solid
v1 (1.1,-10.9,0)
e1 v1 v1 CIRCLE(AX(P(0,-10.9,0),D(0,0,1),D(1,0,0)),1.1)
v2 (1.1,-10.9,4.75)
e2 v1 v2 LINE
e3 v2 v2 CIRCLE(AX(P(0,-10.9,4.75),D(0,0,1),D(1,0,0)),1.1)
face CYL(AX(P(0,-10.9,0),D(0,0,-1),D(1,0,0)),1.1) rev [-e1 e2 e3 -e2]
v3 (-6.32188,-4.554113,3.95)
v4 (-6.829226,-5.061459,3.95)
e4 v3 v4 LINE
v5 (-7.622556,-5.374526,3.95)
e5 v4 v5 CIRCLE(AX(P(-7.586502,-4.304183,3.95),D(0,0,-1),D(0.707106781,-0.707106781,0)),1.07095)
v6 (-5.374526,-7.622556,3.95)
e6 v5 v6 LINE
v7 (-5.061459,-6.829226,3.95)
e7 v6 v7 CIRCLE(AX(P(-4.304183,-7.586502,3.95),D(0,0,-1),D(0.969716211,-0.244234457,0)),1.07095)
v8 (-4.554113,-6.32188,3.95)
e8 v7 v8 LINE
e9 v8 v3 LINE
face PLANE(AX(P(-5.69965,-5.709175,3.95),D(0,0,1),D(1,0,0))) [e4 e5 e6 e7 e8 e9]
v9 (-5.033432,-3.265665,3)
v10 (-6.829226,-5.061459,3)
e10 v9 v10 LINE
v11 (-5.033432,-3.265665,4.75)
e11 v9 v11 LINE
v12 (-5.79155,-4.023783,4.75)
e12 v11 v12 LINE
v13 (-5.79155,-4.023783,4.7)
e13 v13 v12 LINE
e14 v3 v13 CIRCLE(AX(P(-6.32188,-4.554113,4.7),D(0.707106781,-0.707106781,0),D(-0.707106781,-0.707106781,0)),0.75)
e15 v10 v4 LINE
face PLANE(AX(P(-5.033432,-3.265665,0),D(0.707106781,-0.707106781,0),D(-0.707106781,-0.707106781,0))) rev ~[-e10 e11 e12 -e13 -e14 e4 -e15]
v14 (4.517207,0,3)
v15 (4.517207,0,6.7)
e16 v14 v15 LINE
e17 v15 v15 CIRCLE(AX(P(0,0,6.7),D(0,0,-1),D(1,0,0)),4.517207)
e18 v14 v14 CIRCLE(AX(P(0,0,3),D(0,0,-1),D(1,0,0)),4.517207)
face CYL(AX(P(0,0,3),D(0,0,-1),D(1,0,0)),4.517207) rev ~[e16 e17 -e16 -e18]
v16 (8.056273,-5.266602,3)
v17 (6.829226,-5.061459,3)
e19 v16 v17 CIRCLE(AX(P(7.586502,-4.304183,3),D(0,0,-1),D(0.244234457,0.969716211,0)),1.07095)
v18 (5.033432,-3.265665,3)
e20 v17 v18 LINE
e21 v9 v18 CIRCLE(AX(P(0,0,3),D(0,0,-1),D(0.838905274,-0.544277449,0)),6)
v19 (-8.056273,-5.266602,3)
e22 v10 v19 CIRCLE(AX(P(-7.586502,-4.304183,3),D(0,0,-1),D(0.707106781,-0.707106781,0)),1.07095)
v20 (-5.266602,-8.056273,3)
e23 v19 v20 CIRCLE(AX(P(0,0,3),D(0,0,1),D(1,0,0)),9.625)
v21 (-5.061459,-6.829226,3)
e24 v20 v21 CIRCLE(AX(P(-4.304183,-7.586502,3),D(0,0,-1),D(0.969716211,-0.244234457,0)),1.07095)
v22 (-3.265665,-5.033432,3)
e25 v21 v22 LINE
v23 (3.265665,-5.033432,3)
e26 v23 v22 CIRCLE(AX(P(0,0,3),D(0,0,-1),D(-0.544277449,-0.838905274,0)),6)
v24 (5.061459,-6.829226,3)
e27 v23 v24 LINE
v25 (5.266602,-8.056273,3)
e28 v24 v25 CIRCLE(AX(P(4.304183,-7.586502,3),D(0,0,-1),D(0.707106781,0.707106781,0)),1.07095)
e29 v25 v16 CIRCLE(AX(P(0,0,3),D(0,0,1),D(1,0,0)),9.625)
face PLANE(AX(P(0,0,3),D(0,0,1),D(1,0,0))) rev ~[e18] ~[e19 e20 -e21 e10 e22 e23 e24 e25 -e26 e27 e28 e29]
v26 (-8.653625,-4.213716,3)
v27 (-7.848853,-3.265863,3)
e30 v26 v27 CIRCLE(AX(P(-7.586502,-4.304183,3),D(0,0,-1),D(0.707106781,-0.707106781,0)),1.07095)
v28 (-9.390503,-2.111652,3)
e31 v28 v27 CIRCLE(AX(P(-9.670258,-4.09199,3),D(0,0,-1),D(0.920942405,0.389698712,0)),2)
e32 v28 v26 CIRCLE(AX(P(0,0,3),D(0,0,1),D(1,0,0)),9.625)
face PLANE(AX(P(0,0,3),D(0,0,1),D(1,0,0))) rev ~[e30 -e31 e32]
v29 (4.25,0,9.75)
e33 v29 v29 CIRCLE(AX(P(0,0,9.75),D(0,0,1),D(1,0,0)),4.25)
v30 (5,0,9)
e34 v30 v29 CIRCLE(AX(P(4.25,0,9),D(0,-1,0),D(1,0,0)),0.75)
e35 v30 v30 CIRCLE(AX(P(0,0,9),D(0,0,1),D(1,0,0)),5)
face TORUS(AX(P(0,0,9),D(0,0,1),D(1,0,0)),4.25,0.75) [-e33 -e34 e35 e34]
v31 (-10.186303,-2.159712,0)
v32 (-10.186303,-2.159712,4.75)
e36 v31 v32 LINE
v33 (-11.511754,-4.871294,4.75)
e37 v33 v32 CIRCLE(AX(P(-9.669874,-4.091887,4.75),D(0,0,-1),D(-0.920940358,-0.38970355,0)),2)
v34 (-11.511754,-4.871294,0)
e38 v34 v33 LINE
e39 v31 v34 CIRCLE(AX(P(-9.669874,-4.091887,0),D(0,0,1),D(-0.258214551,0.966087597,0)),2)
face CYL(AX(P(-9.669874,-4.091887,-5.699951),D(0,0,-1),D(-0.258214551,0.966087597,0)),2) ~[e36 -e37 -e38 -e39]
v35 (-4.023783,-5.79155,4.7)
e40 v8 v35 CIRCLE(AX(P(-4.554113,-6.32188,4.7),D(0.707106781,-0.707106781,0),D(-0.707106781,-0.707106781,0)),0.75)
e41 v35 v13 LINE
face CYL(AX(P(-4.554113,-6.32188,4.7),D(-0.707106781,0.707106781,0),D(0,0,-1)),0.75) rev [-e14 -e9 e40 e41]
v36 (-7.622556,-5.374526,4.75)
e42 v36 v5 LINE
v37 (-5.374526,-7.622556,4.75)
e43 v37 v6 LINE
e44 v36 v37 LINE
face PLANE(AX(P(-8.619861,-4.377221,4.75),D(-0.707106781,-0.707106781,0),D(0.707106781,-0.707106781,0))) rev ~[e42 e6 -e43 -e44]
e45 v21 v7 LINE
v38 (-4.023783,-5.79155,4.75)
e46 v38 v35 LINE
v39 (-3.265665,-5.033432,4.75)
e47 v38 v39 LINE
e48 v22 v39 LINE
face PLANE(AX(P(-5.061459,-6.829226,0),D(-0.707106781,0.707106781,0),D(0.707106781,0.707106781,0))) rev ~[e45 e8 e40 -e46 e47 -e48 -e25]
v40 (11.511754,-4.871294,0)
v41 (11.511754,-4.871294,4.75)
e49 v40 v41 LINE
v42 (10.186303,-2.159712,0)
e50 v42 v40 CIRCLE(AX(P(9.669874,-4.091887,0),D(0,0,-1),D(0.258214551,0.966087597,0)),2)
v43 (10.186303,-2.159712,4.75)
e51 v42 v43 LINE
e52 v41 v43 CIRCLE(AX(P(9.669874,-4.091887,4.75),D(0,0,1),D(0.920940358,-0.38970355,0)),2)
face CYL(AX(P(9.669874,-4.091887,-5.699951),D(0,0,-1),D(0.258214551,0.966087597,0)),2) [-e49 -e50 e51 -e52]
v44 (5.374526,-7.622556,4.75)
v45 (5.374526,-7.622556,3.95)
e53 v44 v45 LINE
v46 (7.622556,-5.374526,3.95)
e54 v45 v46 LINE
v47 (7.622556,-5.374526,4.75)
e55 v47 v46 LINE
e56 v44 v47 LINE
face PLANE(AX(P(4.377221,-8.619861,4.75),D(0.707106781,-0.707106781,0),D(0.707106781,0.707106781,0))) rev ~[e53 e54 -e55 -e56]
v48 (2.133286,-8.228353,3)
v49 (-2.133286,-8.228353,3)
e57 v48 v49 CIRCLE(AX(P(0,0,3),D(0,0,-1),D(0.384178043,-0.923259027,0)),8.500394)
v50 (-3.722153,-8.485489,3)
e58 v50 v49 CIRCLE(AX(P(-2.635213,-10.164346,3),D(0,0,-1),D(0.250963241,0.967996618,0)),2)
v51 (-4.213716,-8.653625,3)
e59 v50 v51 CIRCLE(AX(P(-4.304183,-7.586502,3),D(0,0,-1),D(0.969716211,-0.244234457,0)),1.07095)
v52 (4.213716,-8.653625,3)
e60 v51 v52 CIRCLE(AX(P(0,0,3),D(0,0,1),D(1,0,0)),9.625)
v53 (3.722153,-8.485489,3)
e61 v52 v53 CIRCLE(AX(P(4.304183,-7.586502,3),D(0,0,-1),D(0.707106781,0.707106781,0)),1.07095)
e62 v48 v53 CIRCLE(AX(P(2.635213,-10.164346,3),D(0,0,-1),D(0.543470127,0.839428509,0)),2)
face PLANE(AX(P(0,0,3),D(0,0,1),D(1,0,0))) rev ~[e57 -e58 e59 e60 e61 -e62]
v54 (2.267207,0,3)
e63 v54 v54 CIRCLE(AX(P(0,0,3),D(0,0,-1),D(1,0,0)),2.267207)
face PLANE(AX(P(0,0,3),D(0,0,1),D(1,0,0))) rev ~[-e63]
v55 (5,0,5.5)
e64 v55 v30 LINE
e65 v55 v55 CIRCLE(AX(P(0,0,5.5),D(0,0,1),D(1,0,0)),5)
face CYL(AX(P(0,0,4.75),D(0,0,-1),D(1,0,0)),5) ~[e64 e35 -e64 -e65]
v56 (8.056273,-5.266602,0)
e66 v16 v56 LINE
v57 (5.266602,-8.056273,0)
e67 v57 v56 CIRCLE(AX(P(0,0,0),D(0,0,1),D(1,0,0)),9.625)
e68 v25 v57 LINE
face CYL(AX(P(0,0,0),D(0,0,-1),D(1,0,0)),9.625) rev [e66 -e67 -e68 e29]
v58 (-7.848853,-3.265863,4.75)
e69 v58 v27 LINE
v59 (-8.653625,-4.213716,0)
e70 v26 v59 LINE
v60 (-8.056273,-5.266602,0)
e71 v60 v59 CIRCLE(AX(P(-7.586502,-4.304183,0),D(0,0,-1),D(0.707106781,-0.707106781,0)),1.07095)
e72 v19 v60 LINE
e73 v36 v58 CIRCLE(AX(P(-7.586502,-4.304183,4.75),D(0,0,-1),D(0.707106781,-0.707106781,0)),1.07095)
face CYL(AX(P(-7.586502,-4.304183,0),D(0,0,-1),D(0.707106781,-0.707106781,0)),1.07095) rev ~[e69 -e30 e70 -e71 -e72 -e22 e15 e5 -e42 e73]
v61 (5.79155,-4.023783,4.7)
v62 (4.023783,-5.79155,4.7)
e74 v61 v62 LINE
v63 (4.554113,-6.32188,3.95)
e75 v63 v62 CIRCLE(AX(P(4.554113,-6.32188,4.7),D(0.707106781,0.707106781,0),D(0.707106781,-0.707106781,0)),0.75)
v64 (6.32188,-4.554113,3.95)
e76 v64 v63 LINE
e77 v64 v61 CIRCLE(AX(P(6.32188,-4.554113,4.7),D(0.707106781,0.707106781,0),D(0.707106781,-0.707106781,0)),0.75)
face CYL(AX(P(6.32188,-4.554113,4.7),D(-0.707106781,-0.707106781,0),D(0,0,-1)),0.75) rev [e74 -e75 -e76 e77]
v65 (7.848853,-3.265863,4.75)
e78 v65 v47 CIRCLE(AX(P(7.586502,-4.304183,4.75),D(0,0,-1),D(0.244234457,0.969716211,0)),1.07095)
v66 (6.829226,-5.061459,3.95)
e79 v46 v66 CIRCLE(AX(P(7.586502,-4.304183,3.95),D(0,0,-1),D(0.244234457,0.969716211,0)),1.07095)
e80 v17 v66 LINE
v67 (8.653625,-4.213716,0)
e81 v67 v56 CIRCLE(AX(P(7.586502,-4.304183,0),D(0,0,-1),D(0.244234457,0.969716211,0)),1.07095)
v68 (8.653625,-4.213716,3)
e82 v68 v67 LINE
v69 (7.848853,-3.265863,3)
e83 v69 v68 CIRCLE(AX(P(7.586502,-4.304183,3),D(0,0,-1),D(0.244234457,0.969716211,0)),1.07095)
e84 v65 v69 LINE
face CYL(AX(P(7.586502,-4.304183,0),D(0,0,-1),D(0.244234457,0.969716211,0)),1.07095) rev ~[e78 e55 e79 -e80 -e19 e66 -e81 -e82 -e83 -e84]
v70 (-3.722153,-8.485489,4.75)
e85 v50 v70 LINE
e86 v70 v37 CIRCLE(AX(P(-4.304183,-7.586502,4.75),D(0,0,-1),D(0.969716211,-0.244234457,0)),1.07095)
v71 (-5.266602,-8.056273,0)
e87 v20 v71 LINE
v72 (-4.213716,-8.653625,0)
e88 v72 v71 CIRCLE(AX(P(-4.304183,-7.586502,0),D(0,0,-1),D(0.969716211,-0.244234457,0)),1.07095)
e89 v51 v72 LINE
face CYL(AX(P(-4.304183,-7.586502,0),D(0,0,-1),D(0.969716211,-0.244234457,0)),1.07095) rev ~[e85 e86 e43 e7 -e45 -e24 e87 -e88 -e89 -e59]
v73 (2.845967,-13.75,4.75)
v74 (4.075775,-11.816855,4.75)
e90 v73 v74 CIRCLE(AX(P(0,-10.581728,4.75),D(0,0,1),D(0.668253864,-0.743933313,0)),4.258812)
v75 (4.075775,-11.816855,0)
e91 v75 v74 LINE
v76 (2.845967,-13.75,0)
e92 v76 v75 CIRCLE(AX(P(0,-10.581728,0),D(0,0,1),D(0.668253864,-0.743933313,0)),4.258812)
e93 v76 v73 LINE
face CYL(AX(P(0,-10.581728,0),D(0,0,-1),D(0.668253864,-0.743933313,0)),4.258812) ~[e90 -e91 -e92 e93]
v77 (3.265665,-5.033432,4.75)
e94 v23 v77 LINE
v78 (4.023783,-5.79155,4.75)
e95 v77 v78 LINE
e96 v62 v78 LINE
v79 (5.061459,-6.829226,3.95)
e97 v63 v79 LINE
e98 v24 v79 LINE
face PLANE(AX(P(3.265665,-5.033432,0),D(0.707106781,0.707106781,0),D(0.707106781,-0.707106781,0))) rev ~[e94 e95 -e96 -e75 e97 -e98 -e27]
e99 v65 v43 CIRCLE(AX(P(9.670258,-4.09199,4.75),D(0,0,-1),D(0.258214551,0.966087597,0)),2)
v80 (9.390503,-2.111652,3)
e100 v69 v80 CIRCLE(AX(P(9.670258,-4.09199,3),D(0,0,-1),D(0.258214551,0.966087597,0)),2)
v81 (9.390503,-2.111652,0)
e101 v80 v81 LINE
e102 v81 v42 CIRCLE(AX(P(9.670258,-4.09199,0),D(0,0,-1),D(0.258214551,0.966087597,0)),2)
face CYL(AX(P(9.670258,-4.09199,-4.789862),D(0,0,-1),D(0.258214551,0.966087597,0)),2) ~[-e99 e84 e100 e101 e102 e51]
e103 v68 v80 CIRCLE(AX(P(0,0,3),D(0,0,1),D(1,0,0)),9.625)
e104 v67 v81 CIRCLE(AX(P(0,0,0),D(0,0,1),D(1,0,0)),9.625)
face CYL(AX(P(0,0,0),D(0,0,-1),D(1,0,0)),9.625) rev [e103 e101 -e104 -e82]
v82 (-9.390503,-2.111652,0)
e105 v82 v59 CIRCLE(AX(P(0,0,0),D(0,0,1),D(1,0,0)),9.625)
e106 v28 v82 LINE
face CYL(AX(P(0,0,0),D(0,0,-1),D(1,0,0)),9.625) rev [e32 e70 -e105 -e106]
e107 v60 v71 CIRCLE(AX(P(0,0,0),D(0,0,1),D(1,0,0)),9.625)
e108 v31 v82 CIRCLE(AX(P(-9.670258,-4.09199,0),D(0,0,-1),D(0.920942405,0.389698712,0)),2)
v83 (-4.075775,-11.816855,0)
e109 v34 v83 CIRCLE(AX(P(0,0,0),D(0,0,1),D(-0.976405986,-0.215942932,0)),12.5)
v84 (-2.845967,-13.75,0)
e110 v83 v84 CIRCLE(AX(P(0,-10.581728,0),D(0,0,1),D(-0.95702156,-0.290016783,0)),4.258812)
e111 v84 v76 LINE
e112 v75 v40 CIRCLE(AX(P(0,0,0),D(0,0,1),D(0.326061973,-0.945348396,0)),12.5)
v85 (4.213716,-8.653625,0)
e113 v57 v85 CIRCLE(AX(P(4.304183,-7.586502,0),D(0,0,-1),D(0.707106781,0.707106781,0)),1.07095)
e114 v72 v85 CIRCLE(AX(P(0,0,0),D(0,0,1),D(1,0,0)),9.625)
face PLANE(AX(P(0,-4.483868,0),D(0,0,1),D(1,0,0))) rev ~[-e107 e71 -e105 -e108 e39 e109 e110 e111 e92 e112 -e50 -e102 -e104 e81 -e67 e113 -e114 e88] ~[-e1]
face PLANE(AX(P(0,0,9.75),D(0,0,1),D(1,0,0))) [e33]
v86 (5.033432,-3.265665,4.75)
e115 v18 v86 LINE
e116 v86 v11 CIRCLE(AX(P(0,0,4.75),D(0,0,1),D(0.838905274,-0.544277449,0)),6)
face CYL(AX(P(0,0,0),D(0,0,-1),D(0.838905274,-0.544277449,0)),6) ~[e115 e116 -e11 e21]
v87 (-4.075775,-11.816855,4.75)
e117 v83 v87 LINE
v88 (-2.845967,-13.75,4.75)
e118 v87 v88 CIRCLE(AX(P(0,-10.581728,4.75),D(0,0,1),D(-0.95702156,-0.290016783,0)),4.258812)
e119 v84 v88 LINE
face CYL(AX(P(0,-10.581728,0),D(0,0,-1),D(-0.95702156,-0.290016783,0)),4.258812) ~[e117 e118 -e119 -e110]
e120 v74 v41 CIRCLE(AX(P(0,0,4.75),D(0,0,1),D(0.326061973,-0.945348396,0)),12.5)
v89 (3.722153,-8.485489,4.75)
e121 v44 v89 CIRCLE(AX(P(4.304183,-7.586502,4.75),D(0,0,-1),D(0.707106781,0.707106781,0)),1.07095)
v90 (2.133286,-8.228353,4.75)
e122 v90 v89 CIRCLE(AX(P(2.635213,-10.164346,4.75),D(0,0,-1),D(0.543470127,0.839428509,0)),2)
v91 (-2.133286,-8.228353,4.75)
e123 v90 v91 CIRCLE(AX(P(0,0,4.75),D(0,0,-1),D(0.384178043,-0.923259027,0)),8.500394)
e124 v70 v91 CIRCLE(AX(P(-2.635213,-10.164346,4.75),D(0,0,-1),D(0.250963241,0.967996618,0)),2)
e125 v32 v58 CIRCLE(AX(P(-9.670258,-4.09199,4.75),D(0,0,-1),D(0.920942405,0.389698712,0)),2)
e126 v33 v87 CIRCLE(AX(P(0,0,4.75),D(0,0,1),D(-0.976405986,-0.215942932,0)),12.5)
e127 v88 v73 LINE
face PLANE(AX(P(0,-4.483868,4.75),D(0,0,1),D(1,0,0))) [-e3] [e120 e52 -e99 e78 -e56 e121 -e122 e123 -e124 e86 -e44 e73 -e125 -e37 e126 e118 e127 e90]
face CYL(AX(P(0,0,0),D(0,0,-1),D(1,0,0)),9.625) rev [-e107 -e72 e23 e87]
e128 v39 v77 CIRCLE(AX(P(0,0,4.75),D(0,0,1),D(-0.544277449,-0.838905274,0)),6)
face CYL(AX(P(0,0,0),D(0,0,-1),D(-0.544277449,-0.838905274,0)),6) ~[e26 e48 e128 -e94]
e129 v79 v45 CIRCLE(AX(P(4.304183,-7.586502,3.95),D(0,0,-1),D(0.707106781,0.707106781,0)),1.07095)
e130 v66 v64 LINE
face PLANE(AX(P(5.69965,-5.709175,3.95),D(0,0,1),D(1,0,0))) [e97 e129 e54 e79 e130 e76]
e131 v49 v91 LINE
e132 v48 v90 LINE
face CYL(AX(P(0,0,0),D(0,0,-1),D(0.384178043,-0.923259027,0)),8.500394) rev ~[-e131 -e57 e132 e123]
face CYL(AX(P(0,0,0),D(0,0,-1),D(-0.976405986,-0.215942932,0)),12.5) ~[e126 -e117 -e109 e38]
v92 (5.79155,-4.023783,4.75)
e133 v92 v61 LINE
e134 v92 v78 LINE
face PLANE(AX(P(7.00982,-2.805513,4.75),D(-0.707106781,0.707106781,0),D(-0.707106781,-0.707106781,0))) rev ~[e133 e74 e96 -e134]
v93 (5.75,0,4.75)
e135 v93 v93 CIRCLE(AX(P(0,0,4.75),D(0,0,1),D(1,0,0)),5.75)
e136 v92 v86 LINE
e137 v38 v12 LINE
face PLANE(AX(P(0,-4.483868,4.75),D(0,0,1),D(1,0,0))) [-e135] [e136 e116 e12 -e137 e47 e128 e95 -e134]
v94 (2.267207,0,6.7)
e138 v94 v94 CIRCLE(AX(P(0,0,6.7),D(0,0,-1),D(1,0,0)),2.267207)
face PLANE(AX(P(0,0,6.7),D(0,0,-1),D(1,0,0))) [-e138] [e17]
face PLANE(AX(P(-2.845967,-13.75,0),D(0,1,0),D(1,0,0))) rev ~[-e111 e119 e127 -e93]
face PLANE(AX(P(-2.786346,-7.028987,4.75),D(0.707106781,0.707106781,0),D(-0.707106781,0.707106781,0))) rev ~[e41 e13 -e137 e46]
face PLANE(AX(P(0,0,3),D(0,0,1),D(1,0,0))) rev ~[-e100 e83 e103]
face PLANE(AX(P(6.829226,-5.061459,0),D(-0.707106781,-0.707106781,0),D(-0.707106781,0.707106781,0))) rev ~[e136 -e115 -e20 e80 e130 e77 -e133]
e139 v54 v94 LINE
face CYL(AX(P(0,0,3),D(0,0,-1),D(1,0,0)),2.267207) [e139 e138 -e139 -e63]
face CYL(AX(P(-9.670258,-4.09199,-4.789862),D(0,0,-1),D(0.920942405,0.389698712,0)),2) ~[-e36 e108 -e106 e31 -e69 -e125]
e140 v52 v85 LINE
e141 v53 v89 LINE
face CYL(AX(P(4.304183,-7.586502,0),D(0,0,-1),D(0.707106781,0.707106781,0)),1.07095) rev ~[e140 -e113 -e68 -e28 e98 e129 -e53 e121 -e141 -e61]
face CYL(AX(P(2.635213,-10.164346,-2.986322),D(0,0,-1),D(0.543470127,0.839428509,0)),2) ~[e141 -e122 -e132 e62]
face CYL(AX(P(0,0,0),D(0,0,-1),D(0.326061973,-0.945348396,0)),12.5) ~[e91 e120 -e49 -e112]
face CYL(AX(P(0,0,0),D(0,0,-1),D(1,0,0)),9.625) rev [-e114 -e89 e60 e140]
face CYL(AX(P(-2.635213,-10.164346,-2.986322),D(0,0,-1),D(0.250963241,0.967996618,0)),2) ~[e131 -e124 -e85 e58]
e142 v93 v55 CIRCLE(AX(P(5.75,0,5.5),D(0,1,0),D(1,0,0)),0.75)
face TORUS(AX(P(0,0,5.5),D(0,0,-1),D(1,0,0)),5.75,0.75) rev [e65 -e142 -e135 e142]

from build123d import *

# Parameters (mm, degrees)
F0_R        = 1.1
F1_DEPTH    = 4.75
F2_R        = 5
F3_DEPTH    = 5
F5_T1_DEPTH = 16.1499020619
F5_T3_DEPTH = 14.3297238483
F5_T5_DEPTH = 10.7226436636
F7_DEPTH    = 0.8
F8_R        = 0.75
F9_R        = 9.625
F10_DEPTH   = 3
F12_R       = 4.5172071506
F12_R_2     = 2.2672071506
F13_DEPTH   = 3.7


# Not quite as in the source:
# - a fillet or chamfer that OpenCascade refuses, or shapes differently, is made with other operations: its cross-section is extruded or revolved along the edge and cut away or added


with BuildPart() as f1:
    # F0 (on Top) → F1 (new body)
    with BuildSketch(Plane.XY):
        with BuildLine():
            Line((-8.3357166343, -1.6650899635), (-12.2050748298, -2.6992866465))
            ThreePointArc((-12.2050748298, -2.6992866465), (-9.3300068577, -8.3187121621), (-4.0757746589, -11.8168549509))
            ThreePointArc((-4.0757746589, -11.8168549509), (-3.593311946, -12.8676823003), (-2.8459674038, -13.75))
            Line((-2.8459674038, -13.75), (2.8459674038, -13.75))
            ThreePointArc((2.8459674038, -13.75), (3.593311946, -12.8676823003), (4.0757746589, -11.8168549509))
            ThreePointArc((4.0757746589, -11.8168549509), (9.3300068577, -8.3187121621), (12.2050748298, -2.6992866465))
            Line((12.2050748298, -2.6992866465), (8.3357166343, -1.6650899635))
            ThreePointArc((8.3357166343, -1.6650899635), (8.1313688943, -2.4774051544), (7.8480653995, -3.2656646917))
            ThreePointArc((7.8480653995, -3.2656646917), (8.5179809488, -4.8326547168), (6.82922604, -5.061459087))
            Line((6.82922604, -5.061459087), (5.0334316447, -3.2656646917))
            ThreePointArc((5.0334316447, -3.2656646917), (0, 6), (-5.0334316447, -3.2656646917))
            Line((-5.0334316447, -3.2656646917), (-6.82922604, -5.061459087))
            ThreePointArc((-6.82922604, -5.061459087), (-8.5179809488, -4.8326547168), (-7.8480653995, -3.2656646917))
            ThreePointArc((-7.8480653995, -3.2656646917), (-8.1313688943, -2.4774051544), (-8.3357166343, -1.6650899635))
        make_face()
        with Locations((0, -10.9)):
            Circle(F0_R, mode=Mode.SUBTRACT)
        with BuildLine():
            Line((-5.061459087, -6.82922604), (-3.2656646917, -5.0334316447))
            ThreePointArc((-3.2656646917, -5.0334316447), (0, -6), (3.2656646917, -5.0334316447))
            Line((3.2656646917, -5.0334316447), (5.061459087, -6.82922604))
            ThreePointArc((5.061459087, -6.82922604), (4.8326547168, -8.5179809488), (3.2656646917, -7.8480653995))
            ThreePointArc((3.2656646917, -7.8480653995), (0, -8.5003938964), (-3.2656646917, -7.8480653995))
            ThreePointArc((-3.2656646917, -7.8480653995), (-4.8326547168, -8.5179809488), (-5.061459087, -6.82922604))
        make_face(mode=Mode.SUBTRACT)
    extrude(amount=F1_DEPTH)

    # F2 (on face) → F3 (join)
    with BuildSketch(Plane.XY.offset(4.75)):
        Circle(F2_R)
    extrude(amount=F3_DEPTH)

    # F5: fillet of radius 2 on 6 edges, made by hand

    # F5_s2 → F5_t1 (cut)
    with BuildSketch(Plane.XY.offset(-5.6999510309)):
        with BuildLine():
            ThreePointArc((10.1863028618, -2.1597120795), (11.4666976063, -3.2135797735), (11.5117544763, -4.871294374))
            ThreePointArc((11.5117544763, -4.871294374), (11.9080394052, -3.801131085), (12.2050748298, -2.6992866465))
            Line((12.2050748298, -2.6992866465), (10.1863028618, -2.1597120795))
        make_face()
        with BuildLine():
            ThreePointArc((-10.1863028618, -2.1597120795), (-11.4666976063, -3.2135797735), (-11.5117544763, -4.871294374))
            ThreePointArc((-11.5117544763, -4.871294374), (-11.9080394052, -3.801131085), (-12.2050748298, -2.6992866465))
            Line((-12.2050748298, -2.6992866465), (-10.1863028618, -2.1597120795))
        make_face()
    extrude(amount=F5_T1_DEPTH, mode=Mode.SUBTRACT)

    # F5_s4 → F5_t3 (cut)
    with BuildSketch(Plane.XY.offset(-4.7898619242)):
        with BuildLine():
            ThreePointArc((10.1866871135, -2.1598147817), (8.7919457915, -2.2951684372), (7.8283732011, -3.3125925525))
            ThreePointArc((7.8283732011, -3.3125925525), (8.1239163121, -2.5017354271), (8.3357166343, -1.6650899635))
            Line((8.3357166343, -1.6650899635), (10.1866871135, -2.1598147817))
        make_face()
        with BuildLine():
            ThreePointArc((-7.8283732011, -3.3125925525), (-8.7919457915, -2.2951684372), (-10.1866871135, -2.1598147817))
            Line((-10.1866871135, -2.1598147817), (-8.3357166343, -1.6650899635))
            ThreePointArc((-8.3357166343, -1.6650899635), (-8.1239163121, -2.5017354271), (-7.8283732011, -3.3125925525))
        make_face()
    extrude(amount=F5_T3_DEPTH, mode=Mode.SUBTRACT)

    # F5_s6 → F5_t5 (cut)
    with BuildSketch(Plane.XY.offset(-2.9863218318)):
        with BuildLine():
            ThreePointArc((3.7221531416, -8.4854887571), (2.954728203, -8.190033245), (2.1332864048, -8.2283525392))
            ThreePointArc((2.1332864048, -8.2283525392), (2.7061638555, -8.0581246938), (3.2656646917, -7.8480653995))
            ThreePointArc((3.2656646917, -7.8480653995), (3.4334814116, -8.2100520192), (3.7221531416, -8.4854887571))
        make_face()
        with BuildLine():
            ThreePointArc((-2.1332864048, -8.2283525392), (-2.954728203, -8.190033245), (-3.7221531416, -8.4854887571))
            ThreePointArc((-3.7221531416, -8.4854887571), (-3.4334814116, -8.2100520192), (-3.2656646917, -7.8480653995))
            ThreePointArc((-3.2656646917, -7.8480653995), (-2.7061638555, -8.0581246938), (-2.1332864048, -8.2283525392))
        make_face()
    extrude(amount=F5_T5_DEPTH, mode=Mode.SUBTRACT)

    # F6 (on face) → F7 (cut)
    with BuildSketch(Plane.XY.offset(4.75)):
        Polygon((4.377220794, -8.6198614811), (8.6198614811, -4.377220794), (7.0098197866, -2.8055128878), (2.7863459937, -7.0289866808), align=None)
        Polygon((-4.377220794, -8.6198614811), (-2.7863459937, -7.0289866808), (-7.0098197866, -2.8055128878), (-8.6198614811, -4.377220794), align=None)
    extrude(amount=-F7_DEPTH, mode=Mode.SUBTRACT)

    # F8
    f8_edges = [f1.edges().sort_by_distance(p)[0] for p in [
        (4.907666, -4.907666, 3.95),
        (-4.907666, -4.907666, 3.95),
        (-5, 0, 4.75),
        (-5, 0, 9.75),
    ]]
    fillet(f8_edges, radius=F8_R)

    # F9 (on Top) → F10 (cut)
    with BuildSketch(Plane.XY):
        Circle(F9_R)
    extrude(amount=F10_DEPTH, mode=Mode.SUBTRACT)

    # F12 (on face) → F13 (cut)
    with BuildSketch(Plane(origin=(0, 0, 3), x_dir=(1, 0, 0), z_dir=(0, 0, -1))):
        Circle(F12_R)
        Circle(F12_R_2, mode=Mode.SUBTRACT)
    extrude(amount=-F13_DEPTH, mode=Mode.SUBTRACT)


solid = f1.part
